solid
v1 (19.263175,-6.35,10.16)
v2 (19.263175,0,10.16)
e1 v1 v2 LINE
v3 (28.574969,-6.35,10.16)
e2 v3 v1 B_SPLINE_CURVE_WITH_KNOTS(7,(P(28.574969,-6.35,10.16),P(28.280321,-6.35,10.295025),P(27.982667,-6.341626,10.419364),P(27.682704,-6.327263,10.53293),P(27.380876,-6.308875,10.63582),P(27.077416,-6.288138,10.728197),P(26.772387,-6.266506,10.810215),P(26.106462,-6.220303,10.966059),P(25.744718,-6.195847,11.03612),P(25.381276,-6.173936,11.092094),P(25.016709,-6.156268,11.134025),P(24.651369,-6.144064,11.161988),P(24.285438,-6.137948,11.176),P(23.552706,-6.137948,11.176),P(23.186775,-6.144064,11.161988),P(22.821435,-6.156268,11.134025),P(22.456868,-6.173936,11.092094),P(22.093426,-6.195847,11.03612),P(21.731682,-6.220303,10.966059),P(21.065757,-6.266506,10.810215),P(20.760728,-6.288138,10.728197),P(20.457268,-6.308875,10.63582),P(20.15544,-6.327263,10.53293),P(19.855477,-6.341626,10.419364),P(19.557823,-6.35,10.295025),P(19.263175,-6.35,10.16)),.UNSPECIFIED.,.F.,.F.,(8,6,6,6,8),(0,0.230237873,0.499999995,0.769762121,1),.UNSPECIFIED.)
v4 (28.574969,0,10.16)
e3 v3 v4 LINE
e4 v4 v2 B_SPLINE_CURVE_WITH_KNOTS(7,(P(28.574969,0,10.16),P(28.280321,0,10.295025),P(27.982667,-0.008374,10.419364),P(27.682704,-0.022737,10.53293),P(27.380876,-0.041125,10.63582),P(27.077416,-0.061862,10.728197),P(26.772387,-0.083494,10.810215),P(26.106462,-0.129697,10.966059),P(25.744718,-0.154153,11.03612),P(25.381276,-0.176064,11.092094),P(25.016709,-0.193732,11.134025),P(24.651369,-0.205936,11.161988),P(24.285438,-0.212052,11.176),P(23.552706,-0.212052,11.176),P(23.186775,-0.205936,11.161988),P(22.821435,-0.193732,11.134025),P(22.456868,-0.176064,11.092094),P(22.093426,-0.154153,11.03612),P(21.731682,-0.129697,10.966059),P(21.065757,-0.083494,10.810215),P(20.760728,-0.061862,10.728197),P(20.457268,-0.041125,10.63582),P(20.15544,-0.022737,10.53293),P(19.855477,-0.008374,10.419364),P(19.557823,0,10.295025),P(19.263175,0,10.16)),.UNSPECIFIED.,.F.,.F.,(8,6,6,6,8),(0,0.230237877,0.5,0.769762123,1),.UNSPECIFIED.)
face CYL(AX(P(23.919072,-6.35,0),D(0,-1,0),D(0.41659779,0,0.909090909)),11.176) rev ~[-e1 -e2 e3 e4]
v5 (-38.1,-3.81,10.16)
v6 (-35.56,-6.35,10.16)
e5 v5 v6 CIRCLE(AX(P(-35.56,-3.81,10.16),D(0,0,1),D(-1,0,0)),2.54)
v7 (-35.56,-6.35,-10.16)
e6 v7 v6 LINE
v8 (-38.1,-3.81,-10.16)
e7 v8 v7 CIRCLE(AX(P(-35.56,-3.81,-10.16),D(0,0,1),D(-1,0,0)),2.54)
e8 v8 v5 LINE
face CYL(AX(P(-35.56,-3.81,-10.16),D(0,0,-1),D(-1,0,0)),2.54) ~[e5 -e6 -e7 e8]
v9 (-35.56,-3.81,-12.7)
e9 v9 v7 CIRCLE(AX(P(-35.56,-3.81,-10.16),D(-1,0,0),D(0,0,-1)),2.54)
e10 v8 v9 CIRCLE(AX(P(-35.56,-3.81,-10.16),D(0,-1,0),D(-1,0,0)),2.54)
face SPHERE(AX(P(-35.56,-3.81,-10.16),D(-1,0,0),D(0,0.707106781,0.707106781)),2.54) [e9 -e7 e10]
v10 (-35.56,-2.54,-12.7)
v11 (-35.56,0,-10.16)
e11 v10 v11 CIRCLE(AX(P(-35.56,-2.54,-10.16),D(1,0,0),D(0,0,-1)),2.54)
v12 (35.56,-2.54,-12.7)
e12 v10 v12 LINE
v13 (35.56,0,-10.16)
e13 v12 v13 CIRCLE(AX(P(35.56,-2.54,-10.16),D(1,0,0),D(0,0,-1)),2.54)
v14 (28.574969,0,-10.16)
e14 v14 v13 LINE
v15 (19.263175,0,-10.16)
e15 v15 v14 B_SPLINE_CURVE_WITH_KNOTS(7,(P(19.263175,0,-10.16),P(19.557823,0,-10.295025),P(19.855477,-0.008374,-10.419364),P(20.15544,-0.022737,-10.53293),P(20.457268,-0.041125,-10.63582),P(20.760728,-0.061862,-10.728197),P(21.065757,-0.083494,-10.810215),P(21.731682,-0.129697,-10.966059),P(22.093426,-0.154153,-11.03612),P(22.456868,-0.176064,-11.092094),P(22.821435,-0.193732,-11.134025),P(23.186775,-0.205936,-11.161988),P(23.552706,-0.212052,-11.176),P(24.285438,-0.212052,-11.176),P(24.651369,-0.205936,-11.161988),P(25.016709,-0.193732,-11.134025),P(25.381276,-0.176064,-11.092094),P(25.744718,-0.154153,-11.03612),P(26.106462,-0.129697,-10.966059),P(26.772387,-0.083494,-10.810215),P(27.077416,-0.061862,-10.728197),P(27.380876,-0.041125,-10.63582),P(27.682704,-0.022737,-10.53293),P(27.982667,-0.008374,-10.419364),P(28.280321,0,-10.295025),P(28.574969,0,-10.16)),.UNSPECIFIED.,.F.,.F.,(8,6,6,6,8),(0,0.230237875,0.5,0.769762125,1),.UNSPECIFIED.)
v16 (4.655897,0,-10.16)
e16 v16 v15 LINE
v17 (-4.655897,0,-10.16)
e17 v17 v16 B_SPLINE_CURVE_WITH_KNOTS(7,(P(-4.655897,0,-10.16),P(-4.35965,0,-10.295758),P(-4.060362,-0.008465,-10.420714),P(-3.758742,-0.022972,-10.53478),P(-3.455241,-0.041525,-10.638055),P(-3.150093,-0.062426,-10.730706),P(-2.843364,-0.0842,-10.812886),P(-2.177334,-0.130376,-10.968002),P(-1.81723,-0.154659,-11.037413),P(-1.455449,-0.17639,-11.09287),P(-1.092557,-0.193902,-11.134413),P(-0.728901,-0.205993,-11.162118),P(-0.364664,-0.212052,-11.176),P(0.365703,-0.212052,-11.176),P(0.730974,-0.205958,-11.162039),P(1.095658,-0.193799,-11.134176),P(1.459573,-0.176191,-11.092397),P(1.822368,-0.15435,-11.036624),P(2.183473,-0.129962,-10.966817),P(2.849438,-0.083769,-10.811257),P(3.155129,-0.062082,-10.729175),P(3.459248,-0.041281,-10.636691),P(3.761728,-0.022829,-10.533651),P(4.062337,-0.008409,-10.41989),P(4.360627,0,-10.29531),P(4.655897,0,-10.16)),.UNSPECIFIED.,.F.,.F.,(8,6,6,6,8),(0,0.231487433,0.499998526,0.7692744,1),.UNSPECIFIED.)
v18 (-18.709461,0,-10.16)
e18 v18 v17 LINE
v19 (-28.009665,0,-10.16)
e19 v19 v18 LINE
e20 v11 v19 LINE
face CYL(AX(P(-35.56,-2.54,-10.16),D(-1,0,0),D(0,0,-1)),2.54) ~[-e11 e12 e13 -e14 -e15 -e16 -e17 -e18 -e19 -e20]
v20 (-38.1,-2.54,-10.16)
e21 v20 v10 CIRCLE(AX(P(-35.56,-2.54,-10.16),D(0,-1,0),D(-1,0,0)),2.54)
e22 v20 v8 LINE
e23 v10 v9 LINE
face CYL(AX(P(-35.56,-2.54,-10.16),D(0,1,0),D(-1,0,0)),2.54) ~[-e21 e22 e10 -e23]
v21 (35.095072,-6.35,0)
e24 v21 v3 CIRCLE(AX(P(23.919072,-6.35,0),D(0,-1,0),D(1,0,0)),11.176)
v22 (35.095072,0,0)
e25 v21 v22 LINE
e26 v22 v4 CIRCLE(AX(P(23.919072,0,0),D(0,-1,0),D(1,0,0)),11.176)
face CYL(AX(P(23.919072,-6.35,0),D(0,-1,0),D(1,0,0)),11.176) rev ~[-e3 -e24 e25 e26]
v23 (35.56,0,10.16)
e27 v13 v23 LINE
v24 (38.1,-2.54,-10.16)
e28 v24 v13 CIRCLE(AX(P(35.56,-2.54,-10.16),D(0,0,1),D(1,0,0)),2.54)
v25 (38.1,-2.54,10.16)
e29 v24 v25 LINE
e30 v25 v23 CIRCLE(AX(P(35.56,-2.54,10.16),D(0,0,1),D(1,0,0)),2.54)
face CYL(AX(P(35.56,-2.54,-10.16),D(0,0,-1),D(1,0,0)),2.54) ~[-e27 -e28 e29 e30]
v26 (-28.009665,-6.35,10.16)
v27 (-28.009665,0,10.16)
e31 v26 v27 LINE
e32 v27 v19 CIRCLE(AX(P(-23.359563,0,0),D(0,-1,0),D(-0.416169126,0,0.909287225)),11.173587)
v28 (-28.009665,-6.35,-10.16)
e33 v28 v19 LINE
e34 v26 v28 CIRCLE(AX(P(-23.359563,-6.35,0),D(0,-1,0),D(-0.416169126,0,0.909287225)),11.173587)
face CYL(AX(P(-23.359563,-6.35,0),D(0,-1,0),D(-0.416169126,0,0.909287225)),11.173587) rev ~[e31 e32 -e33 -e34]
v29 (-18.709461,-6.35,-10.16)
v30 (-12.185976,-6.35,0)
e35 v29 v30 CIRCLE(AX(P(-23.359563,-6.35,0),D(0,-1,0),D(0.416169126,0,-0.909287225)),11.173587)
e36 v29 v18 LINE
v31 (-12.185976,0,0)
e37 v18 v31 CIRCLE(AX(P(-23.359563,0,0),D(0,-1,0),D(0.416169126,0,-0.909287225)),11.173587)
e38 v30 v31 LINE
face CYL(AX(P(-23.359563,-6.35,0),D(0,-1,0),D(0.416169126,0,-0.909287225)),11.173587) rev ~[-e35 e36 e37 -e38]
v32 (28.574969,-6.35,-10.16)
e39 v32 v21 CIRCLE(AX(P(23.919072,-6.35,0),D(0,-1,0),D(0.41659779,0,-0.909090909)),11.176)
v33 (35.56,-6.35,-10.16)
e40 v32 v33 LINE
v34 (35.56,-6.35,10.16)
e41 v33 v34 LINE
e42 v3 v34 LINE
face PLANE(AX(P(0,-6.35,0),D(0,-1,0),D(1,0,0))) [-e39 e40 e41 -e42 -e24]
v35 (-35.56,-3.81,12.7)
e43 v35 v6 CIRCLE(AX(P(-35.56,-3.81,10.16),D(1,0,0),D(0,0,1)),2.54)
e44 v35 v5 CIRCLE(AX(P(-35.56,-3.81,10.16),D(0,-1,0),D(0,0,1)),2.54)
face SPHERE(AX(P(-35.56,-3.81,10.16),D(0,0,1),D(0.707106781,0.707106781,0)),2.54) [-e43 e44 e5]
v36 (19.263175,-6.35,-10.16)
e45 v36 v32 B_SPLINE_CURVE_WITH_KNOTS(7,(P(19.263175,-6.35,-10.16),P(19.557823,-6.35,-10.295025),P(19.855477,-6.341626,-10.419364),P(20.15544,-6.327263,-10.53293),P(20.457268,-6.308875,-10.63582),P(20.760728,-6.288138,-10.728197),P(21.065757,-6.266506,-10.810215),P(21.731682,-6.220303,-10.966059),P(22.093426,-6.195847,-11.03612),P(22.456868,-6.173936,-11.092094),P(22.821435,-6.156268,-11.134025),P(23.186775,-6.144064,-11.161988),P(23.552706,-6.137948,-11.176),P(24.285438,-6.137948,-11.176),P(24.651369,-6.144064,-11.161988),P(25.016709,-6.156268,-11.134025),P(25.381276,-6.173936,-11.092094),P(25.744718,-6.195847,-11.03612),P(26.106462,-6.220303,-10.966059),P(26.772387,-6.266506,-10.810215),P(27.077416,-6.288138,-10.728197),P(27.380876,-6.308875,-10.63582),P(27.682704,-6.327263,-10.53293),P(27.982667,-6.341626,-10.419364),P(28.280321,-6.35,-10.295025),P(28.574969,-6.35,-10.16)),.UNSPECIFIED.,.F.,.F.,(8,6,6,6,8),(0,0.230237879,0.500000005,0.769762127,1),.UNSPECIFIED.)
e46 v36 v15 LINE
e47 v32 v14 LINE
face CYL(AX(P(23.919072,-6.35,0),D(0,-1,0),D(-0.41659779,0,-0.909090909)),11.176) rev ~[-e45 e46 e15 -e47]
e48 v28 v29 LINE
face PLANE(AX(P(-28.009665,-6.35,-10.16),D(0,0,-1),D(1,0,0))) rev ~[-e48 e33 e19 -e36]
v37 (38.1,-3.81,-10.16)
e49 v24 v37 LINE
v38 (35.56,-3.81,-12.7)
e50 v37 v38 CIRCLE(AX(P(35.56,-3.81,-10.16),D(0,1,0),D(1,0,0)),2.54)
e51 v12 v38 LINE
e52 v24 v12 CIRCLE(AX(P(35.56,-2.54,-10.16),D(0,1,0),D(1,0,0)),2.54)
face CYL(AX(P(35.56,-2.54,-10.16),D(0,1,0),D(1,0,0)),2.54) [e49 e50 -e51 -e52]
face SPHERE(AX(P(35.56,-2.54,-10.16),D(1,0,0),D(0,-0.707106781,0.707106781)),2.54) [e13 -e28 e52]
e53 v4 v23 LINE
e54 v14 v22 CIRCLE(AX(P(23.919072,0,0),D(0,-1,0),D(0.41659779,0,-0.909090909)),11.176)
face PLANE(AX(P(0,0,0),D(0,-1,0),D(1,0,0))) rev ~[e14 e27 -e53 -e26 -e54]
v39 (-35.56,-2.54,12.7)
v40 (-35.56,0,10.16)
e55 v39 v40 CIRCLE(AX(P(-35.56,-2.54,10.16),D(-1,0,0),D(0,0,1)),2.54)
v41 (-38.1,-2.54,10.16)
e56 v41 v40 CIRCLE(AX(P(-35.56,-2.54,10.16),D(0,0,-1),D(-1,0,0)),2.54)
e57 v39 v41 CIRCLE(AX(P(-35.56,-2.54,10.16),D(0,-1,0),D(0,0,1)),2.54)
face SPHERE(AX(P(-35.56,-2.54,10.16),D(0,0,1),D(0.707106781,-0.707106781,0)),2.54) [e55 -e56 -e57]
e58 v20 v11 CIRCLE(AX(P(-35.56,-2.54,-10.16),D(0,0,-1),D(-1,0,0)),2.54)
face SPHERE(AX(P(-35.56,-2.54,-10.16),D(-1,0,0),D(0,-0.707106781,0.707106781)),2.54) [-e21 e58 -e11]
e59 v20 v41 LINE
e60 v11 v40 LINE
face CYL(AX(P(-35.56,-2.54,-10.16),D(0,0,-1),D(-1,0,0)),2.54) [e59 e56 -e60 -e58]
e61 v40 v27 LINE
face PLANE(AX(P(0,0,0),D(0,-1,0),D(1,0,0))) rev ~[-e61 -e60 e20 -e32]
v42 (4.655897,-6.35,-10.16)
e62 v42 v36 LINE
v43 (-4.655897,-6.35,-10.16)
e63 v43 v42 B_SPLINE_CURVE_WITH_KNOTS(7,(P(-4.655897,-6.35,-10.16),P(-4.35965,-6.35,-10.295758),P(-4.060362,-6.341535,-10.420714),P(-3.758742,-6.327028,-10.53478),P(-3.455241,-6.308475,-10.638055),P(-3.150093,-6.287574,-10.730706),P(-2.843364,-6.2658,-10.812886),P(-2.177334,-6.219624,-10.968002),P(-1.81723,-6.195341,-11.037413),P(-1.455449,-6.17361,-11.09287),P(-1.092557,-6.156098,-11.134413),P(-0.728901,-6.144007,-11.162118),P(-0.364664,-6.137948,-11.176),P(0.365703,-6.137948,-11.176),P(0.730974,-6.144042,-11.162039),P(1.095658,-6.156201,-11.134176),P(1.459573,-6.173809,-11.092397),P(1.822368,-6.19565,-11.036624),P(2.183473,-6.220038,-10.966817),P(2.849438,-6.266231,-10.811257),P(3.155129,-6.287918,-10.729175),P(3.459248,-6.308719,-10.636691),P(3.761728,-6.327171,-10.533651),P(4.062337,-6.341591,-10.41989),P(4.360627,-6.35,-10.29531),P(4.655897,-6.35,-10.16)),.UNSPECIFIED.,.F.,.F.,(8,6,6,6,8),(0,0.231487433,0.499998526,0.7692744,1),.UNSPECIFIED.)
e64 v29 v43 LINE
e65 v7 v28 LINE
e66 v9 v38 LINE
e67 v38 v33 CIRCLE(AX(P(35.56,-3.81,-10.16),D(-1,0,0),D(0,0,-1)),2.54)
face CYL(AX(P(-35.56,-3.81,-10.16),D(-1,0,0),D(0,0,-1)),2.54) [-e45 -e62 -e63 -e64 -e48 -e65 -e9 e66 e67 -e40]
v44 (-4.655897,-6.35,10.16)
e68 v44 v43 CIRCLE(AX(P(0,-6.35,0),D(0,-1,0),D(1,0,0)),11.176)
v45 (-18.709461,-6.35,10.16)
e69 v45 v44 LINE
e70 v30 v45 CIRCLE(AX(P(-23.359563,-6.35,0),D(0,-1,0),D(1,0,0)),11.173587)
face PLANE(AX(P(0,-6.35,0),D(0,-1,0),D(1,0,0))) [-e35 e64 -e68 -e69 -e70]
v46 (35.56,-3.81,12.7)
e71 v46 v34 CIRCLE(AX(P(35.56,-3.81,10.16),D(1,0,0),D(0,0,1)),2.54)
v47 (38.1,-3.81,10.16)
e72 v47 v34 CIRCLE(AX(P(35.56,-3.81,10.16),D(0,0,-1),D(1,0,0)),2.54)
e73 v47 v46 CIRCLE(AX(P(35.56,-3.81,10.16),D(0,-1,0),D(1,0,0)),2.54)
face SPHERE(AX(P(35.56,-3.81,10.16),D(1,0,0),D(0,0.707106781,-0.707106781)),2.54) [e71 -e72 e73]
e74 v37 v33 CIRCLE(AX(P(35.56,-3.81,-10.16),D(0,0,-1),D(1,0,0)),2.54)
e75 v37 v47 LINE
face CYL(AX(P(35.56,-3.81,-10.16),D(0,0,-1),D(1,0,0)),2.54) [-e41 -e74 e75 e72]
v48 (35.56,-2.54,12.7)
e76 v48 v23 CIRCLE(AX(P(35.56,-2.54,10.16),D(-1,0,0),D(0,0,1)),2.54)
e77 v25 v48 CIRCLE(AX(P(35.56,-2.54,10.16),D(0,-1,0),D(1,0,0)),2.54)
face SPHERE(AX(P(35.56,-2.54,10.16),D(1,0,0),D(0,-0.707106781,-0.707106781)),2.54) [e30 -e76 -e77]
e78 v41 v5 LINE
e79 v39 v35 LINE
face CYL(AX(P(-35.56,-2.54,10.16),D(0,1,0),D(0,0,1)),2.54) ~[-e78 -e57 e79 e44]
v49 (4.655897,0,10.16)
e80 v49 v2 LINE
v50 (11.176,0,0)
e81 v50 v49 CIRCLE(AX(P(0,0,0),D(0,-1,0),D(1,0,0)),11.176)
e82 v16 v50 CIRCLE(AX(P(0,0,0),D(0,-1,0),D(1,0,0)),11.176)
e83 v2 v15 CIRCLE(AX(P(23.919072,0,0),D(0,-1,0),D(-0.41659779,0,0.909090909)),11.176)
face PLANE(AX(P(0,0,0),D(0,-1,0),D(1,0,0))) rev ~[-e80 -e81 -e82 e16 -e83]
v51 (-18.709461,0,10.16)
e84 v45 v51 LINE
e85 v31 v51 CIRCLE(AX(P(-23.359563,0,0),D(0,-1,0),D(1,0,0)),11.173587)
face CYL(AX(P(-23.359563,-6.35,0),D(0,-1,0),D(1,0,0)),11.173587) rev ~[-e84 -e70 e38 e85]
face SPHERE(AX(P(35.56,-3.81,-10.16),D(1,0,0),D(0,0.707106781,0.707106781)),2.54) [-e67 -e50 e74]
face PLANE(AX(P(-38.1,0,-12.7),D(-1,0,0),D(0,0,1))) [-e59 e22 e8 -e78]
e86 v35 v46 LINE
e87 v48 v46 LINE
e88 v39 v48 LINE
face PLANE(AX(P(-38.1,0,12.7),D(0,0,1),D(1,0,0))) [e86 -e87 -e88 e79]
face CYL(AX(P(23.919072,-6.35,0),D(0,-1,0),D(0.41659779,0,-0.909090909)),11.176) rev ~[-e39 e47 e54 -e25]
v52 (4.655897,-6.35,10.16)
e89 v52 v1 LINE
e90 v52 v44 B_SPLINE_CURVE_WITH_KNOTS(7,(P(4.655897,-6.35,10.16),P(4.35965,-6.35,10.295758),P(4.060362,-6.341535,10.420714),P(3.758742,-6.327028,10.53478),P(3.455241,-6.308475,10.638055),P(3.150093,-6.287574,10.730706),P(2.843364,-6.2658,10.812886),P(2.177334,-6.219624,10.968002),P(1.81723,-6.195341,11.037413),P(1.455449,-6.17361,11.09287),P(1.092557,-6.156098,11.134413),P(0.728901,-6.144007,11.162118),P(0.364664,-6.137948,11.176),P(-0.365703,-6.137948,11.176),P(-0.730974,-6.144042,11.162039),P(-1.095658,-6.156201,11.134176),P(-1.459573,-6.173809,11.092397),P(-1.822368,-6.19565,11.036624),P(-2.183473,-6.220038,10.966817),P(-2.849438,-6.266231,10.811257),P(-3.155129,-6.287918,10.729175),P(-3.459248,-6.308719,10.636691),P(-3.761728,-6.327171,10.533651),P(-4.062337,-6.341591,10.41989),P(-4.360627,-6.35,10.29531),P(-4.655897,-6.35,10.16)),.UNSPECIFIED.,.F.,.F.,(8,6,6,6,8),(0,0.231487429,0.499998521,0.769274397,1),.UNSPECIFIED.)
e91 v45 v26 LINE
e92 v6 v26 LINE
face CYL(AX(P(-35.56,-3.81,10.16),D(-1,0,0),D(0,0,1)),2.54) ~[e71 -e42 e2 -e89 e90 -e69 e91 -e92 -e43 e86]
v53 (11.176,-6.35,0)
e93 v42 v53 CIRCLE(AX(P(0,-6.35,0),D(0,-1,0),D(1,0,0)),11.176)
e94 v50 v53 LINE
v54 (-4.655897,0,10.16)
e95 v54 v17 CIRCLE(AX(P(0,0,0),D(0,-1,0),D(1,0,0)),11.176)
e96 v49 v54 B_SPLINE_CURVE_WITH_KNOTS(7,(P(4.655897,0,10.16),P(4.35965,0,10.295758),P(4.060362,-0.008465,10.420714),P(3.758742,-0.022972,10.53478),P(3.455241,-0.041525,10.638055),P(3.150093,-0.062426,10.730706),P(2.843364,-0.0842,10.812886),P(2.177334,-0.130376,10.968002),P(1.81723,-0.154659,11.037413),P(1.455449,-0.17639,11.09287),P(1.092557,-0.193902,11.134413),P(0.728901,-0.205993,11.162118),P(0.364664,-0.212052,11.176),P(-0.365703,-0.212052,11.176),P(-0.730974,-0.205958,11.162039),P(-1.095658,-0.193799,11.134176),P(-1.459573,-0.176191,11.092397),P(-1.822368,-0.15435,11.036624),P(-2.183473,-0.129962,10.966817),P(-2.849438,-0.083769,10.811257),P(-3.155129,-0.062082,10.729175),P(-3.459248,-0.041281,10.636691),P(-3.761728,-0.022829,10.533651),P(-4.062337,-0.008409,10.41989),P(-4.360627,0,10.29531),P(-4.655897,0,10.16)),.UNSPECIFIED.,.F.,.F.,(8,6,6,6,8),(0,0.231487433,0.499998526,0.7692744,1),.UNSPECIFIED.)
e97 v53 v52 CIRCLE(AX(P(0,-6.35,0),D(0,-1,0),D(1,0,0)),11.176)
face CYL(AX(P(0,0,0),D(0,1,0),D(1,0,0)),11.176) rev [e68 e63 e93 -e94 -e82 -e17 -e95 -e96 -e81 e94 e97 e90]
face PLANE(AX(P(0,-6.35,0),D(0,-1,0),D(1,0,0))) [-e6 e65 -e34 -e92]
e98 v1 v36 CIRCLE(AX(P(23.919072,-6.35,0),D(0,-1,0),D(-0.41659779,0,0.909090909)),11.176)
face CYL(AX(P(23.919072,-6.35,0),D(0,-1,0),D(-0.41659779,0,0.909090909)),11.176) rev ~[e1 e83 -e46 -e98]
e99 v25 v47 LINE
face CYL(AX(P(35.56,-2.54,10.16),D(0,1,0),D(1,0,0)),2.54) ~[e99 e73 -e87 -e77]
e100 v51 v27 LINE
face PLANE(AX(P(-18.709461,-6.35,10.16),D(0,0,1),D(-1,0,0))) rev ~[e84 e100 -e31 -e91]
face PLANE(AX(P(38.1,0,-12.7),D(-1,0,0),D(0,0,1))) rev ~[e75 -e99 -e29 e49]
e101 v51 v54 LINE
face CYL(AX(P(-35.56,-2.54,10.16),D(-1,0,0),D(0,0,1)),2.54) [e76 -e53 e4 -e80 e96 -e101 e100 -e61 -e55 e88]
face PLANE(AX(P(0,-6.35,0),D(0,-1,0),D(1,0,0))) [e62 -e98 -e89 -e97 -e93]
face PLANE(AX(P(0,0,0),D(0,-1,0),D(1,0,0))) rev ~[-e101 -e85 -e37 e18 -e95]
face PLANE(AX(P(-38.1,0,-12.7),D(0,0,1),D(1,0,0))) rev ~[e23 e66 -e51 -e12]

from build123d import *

# Parameters (mm, degrees)
F0_W         = 76.2
F0_H         = 25.4
F0_R         = 11.176
F1_DEPTH     = 6.35
F2_T1_DEPTH  = 71.12
F2_T3_DEPTH  = 1.27
F2_T5_DEPTH  = 20.32
F2_S9_W      = 2.54
F2_S9_H      = 2.54
F2_T10_DEPTH = 2.54
F2_S15_W     = 2.54
F2_S15_H     = 2.54
F2_T16_DEPTH = 2.54
F2_S21_W     = 2.54
F2_S21_H     = 2.54
F2_T22_DEPTH = 2.54
F2_S27_W     = 2.54
F2_S27_H     = 2.54
F2_T28_DEPTH = 2.54
F2_S33_W     = 2.54
F2_S33_H     = 2.54
F2_T34_DEPTH = 2.54
F2_S39_W     = 2.54
F2_S39_H     = 2.54
F2_T40_DEPTH = 2.54
F2_S45_W     = 2.54
F2_S45_H     = 2.54
F2_T46_DEPTH = 2.54
F2_S51_W     = 2.54
F2_S51_H     = 2.54
F2_T52_DEPTH = 2.54
F4_DEPTH     = 6.35


# Not quite as in the source:
# - a fillet or chamfer that OpenCascade refuses, or shapes differently, is made with other operations: its cross-section is extruded or revolved along the edge and cut away or added


with BuildPart() as f1:
    # F0 (on Front) → F1 (new body)
    with BuildSketch(Plane.XZ):
        Rectangle(F0_W, F0_H)
        Circle(F0_R, mode=Mode.SUBTRACT)
    extrude(amount=F1_DEPTH)

    # F2: fillet of radius 2.54 on 12 edges, made by hand

    # F2_s2 → F2_t1 (cut)
    with BuildSketch(Plane.YZ.offset(-35.56)):
        with BuildLine():
            ThreePointArc((-2.54, -12.7), (-0.7439487758, -11.9560512242), (0, -10.16))
            Line((0, -10.16), (0, -12.7))
            Line((0, -12.7), (-2.54, -12.7))
        make_face()
        with BuildLine():
            ThreePointArc((-3.81, -12.7), (-5.6060512242, -11.9560512242), (-6.35, -10.16))
            Line((-6.35, -10.16), (-6.35, -12.7))
            Line((-6.35, -12.7), (-3.81, -12.7))
        make_face()
        with BuildLine():
            ThreePointArc((-2.54, 12.7), (-0.7439487758, 11.9560512242), (0, 10.16))
            Line((0, 10.16), (0, 12.7))
            Line((0, 12.7), (-2.54, 12.7))
        make_face()
        with BuildLine():
            ThreePointArc((-3.81, 12.7), (-5.6060512242, 11.9560512242), (-6.35, 10.16))
            Line((-6.35, 10.16), (-6.35, 12.7))
            Line((-6.35, 12.7), (-3.81, 12.7))
        make_face()
    extrude(amount=F2_T1_DEPTH, mode=Mode.SUBTRACT)

    # F2_s4 → F2_t3 (cut)
    with BuildSketch(Plane.XZ.offset(2.54)):
        with BuildLine():
            ThreePointArc((-38.1, -10.16), (-37.3560512242, -11.9560512242), (-35.56, -12.7))
            Line((-35.56, -12.7), (-38.1, -12.7))
            Line((-38.1, -12.7), (-38.1, -10.16))
        make_face()
        with BuildLine():
            ThreePointArc((38.1, -10.16), (37.3560512242, -11.9560512242), (35.56, -12.7))
            Line((35.56, -12.7), (38.1, -12.7))
            Line((38.1, -12.7), (38.1, -10.16))
        make_face()
        with BuildLine():
            ThreePointArc((38.1, 10.16), (37.3560512242, 11.9560512242), (35.56, 12.7))
            Line((35.56, 12.7), (38.1, 12.7))
            Line((38.1, 12.7), (38.1, 10.16))
        make_face()
        with BuildLine():
            ThreePointArc((-35.56, 12.7), (-37.3560512242, 11.9560512242), (-38.1, 10.16))
            Line((-38.1, 10.16), (-38.1, 12.7))
            Line((-38.1, 12.7), (-35.56, 12.7))
        make_face()
    extrude(amount=F2_T3_DEPTH, mode=Mode.SUBTRACT)

    # F2_s6 → F2_t5 (cut)
    with BuildSketch(Plane.XY.offset(-10.16)):
        with BuildLine():
            ThreePointArc((-38.1, -3.81), (-37.3560512242, -5.6060512242), (-35.56, -6.35))
            Line((-35.56, -6.35), (-38.1, -6.35))
            Line((-38.1, -6.35), (-38.1, -3.81))
        make_face()
        with BuildLine():
            ThreePointArc((-38.1, -2.54), (-37.3560512242, -0.7439487758), (-35.56, 0))
            Line((-35.56, 0), (-38.1, 0))
            Line((-38.1, 0), (-38.1, -2.54))
        make_face()
        with BuildLine():
            ThreePointArc((38.1, -3.81), (37.3560512242, -5.6060512242), (35.56, -6.35))
            Line((35.56, -6.35), (38.1, -6.35))
            Line((38.1, -6.35), (38.1, -3.81))
        make_face()
        with BuildLine():
            ThreePointArc((38.1, -2.54), (37.3560512242, -0.7439487758), (35.56, 0))
            Line((35.56, 0), (38.1, 0))
            Line((38.1, 0), (38.1, -2.54))
        make_face()
    extrude(amount=F2_T5_DEPTH, mode=Mode.SUBTRACT)


with BuildPart() as f2_tool8:
    # F2_s9 → F2_t10 (new body)
    with BuildSketch(Plane.YZ.offset(-35.56)):
        with Locations((-1.27, -11.43)):
            Rectangle(F2_S9_W, F2_S9_H)
    extrude(amount=-F2_T10_DEPTH)

    # F2_s11 → F2_t12 (revolve, cut)
    with BuildSketch(Plane(origin=(-35.56, -2.54, -10.16), x_dir=(0, -0.7071067812, 0.7071067812), z_dir=(0, -0.7071067812, -0.7071067812))):
        with BuildLine():
            ThreePointArc((0, -2.54), (2.54, 0), (0, 2.54))
            Line((0, 2.54), (0, -2.54))
        make_face()
    revolve(axis=Axis((-35.56, -2.54, -10.16), (-1, 0, 0)), mode=Mode.SUBTRACT)


with BuildPart() as f1_1:
    add(f1.part)

    # F2_t7: cut F2_tool8
    add(f2_tool8.part, mode=Mode.SUBTRACT)


with BuildPart() as f2_tool14:
    # F2_s15 → F2_t16 (new body)
    with BuildSketch(Plane.YZ.offset(35.56)):
        with Locations((-1.27, -11.43)):
            Rectangle(F2_S15_W, F2_S15_H)
    extrude(amount=F2_T16_DEPTH)

    # F2_s17 → F2_t18 (revolve, cut)
    with BuildSketch(Plane(origin=(35.56, -2.54, -10.16), x_dir=(0, -0.7071067812, 0.7071067812), z_dir=(0, 0.7071067812, 0.7071067812))):
        with BuildLine():
            ThreePointArc((0, -2.54), (2.54, 0), (0, 2.54))
            Line((0, 2.54), (0, -2.54))
        make_face()
    revolve(axis=Axis((35.56, -2.54, -10.16), (1, 0, 0)), mode=Mode.SUBTRACT)


with BuildPart() as f1_2:
    add(f1_1.part)

    # F2_t13: cut F2_tool14
    add(f2_tool14.part, mode=Mode.SUBTRACT)


with BuildPart() as f2_tool20:
    # F2_s21 → F2_t22 (new body)
    with BuildSketch(Plane.YZ.offset(-35.56)):
        with Locations((-5.08, -11.43)):
            Rectangle(F2_S21_W, F2_S21_H)
    extrude(amount=-F2_T22_DEPTH)

    # F2_s23 → F2_t24 (revolve, cut)
    with BuildSketch(Plane(origin=(-35.56, -3.81, -10.16), x_dir=(0, 0.7071067812, 0.7071067812), z_dir=(0, -0.7071067812, 0.7071067812))):
        with BuildLine():
            ThreePointArc((0, -2.54), (2.54, 0), (0, 2.54))
            Line((0, 2.54), (0, -2.54))
        make_face()
    revolve(axis=Axis((-35.56, -3.81, -10.16), (-1, 0, 0)), mode=Mode.SUBTRACT)


with BuildPart() as f1_3:
    add(f1_2.part)

    # F2_t19: cut F2_tool20
    add(f2_tool20.part, mode=Mode.SUBTRACT)


with BuildPart() as f2_tool26:
    # F2_s27 → F2_t28 (new body)
    with BuildSketch(Plane.YZ.offset(35.56)):
        with Locations((-5.08, -11.43)):
            Rectangle(F2_S27_W, F2_S27_H)
    extrude(amount=F2_T28_DEPTH)

    # F2_s29 → F2_t30 (revolve, cut)
    with BuildSketch(Plane(origin=(35.56, -3.81, -10.16), x_dir=(0, 0.7071067812, 0.7071067812), z_dir=(0, 0.7071067812, -0.7071067812))):
        with BuildLine():
            ThreePointArc((0, -2.54), (2.54, 0), (0, 2.54))
            Line((0, 2.54), (0, -2.54))
        make_face()
    revolve(axis=Axis((35.56, -3.81, -10.16), (1, 0, 0)), mode=Mode.SUBTRACT)


with BuildPart() as f1_4:
    add(f1_3.part)

    # F2_t25: cut F2_tool26
    add(f2_tool26.part, mode=Mode.SUBTRACT)


with BuildPart() as f2_tool32:
    # F2_s33 → F2_t34 (new body)
    with BuildSketch(Plane.XY.offset(10.16)):
        with Locations((-36.83, -5.08)):
            Rectangle(F2_S33_W, F2_S33_H)
    extrude(amount=F2_T34_DEPTH)

    # F2_s35 → F2_t36 (revolve, cut)
    with BuildSketch(Plane(origin=(-35.56, -3.81, 10.16), x_dir=(0.7071067812, 0.7071067812, 0), z_dir=(0.7071067812, -0.7071067812, 0))):
        with BuildLine():
            ThreePointArc((0, -2.54), (2.54, 0), (0, 2.54))
            Line((0, 2.54), (0, -2.54))
        make_face()
    revolve(axis=Axis((-35.56, -3.81, 10.16), (0, 0, 1)), mode=Mode.SUBTRACT)


with BuildPart() as f1_5:
    add(f1_4.part)

    # F2_t31: cut F2_tool32
    add(f2_tool32.part, mode=Mode.SUBTRACT)


with BuildPart() as f2_tool38:
    # F2_s39 → F2_t40 (new body)
    with BuildSketch(Plane.XY.offset(10.16)):
        with Locations((-36.83, -1.27)):
            Rectangle(F2_S39_W, F2_S39_H)
    extrude(amount=F2_T40_DEPTH)

    # F2_s41 → F2_t42 (revolve, cut)
    with BuildSketch(Plane(origin=(-35.56, -2.54, 10.16), x_dir=(0.7071067812, -0.7071067812, 0), z_dir=(-0.7071067812, -0.7071067812, 0))):
        with BuildLine():
            ThreePointArc((0, -2.54), (2.54, 0), (0, 2.54))
            Line((0, 2.54), (0, -2.54))
        make_face()
    revolve(axis=Axis((-35.56, -2.54, 10.16), (0, 0, 1)), mode=Mode.SUBTRACT)


with BuildPart() as f1_6:
    add(f1_5.part)

    # F2_t37: cut F2_tool38
    add(f2_tool38.part, mode=Mode.SUBTRACT)


with BuildPart() as f2_tool44:
    # F2_s45 → F2_t46 (new body)
    with BuildSketch(Plane.YZ.offset(35.56)):
        with Locations((-5.08, 11.43)):
            Rectangle(F2_S45_W, F2_S45_H)
    extrude(amount=F2_T46_DEPTH)

    # F2_s47 → F2_t48 (revolve, cut)
    with BuildSketch(Plane(origin=(35.56, -3.81, 10.16), x_dir=(0, 0.7071067812, -0.7071067812), z_dir=(0, -0.7071067812, -0.7071067812))):
        with BuildLine():
            ThreePointArc((0, -2.54), (2.54, 0), (0, 2.54))
            Line((0, 2.54), (0, -2.54))
        make_face()
    revolve(axis=Axis((35.56, -3.81, 10.16), (1, 0, 0)), mode=Mode.SUBTRACT)


with BuildPart() as f1_7:
    add(f1_6.part)

    # F2_t43: cut F2_tool44
    add(f2_tool44.part, mode=Mode.SUBTRACT)


with BuildPart() as f2_tool50:
    # F2_s51 → F2_t52 (new body)
    with BuildSketch(Plane.YZ.offset(35.56)):
        with Locations((-1.27, 11.43)):
            Rectangle(F2_S51_W, F2_S51_H)
    extrude(amount=F2_T52_DEPTH)

    # F2_s53 → F2_t54 (revolve, cut)
    with BuildSketch(Plane(origin=(35.56, -2.54, 10.16), x_dir=(0, -0.7071067812, -0.7071067812), z_dir=(0, -0.7071067812, 0.7071067812))):
        with BuildLine():
            ThreePointArc((0, -2.54), (2.54, 0), (0, 2.54))
            Line((0, 2.54), (0, -2.54))
        make_face()
    revolve(axis=Axis((35.56, -2.54, 10.16), (1, 0, 0)), mode=Mode.SUBTRACT)


with BuildPart() as f1_8:
    add(f1_7.part)

    # F2_t49: cut F2_tool50
    add(f2_tool50.part, mode=Mode.SUBTRACT)

    # F3 (on face) → F4 (cut)
    with BuildSketch(Plane.XZ.offset(6.35)):
        with BuildLine():
            ThreePointArc((-18.7094612276, -10.16), (-13.9572398788, -6.0369996274), (-12.1859761156, 0))
            ThreePointArc((-12.1859761156, 0), (-13.9572398788, 6.0369996274), (-18.7094612276, 10.16))
            Line((-18.7094612276, 10.16), (-28.0096651758, 10.16))
            ThreePointArc((-28.0096651758, 10.16), (-34.5331502877, 0), (-28.0096651758, -10.16))
            Line((-28.0096651758, -10.16), (-18.7094612276, -10.16))
        make_face()
        with BuildLine():
            ThreePointArc((28.5749689082, -10.16), (33.3248489457, -6.0360861565), (35.0950720022, 0))
            ThreePointArc((35.0950720022, 0), (33.3248489457, 6.0360861565), (28.5749689082, 10.16))
            Line((28.5749689082, 10.16), (19.2631750961, 10.16))
            ThreePointArc((19.2631750961, 10.16), (12.7430720022, 0), (19.2631750961, -10.16))
            Line((19.2631750961, -10.16), (28.5749689082, -10.16))
        make_face()
        with BuildLine():
            Line((19.2631750961, 10.16), (28.5749689082, 10.16))
            ThreePointArc((28.5749689082, 10.16), (23.9190720022, 11.176), (19.2631750961, 10.16))
        make_face()
        with BuildLine():
            ThreePointArc((19.2631750961, -10.16), (23.9190720022, -11.176), (28.5749689082, -10.16))
            Line((28.5749689082, -10.16), (19.2631750961, -10.16))
        make_face()
    extrude(amount=-F4_DEPTH, mode=Mode.SUBTRACT)


solid = f1_8.part
